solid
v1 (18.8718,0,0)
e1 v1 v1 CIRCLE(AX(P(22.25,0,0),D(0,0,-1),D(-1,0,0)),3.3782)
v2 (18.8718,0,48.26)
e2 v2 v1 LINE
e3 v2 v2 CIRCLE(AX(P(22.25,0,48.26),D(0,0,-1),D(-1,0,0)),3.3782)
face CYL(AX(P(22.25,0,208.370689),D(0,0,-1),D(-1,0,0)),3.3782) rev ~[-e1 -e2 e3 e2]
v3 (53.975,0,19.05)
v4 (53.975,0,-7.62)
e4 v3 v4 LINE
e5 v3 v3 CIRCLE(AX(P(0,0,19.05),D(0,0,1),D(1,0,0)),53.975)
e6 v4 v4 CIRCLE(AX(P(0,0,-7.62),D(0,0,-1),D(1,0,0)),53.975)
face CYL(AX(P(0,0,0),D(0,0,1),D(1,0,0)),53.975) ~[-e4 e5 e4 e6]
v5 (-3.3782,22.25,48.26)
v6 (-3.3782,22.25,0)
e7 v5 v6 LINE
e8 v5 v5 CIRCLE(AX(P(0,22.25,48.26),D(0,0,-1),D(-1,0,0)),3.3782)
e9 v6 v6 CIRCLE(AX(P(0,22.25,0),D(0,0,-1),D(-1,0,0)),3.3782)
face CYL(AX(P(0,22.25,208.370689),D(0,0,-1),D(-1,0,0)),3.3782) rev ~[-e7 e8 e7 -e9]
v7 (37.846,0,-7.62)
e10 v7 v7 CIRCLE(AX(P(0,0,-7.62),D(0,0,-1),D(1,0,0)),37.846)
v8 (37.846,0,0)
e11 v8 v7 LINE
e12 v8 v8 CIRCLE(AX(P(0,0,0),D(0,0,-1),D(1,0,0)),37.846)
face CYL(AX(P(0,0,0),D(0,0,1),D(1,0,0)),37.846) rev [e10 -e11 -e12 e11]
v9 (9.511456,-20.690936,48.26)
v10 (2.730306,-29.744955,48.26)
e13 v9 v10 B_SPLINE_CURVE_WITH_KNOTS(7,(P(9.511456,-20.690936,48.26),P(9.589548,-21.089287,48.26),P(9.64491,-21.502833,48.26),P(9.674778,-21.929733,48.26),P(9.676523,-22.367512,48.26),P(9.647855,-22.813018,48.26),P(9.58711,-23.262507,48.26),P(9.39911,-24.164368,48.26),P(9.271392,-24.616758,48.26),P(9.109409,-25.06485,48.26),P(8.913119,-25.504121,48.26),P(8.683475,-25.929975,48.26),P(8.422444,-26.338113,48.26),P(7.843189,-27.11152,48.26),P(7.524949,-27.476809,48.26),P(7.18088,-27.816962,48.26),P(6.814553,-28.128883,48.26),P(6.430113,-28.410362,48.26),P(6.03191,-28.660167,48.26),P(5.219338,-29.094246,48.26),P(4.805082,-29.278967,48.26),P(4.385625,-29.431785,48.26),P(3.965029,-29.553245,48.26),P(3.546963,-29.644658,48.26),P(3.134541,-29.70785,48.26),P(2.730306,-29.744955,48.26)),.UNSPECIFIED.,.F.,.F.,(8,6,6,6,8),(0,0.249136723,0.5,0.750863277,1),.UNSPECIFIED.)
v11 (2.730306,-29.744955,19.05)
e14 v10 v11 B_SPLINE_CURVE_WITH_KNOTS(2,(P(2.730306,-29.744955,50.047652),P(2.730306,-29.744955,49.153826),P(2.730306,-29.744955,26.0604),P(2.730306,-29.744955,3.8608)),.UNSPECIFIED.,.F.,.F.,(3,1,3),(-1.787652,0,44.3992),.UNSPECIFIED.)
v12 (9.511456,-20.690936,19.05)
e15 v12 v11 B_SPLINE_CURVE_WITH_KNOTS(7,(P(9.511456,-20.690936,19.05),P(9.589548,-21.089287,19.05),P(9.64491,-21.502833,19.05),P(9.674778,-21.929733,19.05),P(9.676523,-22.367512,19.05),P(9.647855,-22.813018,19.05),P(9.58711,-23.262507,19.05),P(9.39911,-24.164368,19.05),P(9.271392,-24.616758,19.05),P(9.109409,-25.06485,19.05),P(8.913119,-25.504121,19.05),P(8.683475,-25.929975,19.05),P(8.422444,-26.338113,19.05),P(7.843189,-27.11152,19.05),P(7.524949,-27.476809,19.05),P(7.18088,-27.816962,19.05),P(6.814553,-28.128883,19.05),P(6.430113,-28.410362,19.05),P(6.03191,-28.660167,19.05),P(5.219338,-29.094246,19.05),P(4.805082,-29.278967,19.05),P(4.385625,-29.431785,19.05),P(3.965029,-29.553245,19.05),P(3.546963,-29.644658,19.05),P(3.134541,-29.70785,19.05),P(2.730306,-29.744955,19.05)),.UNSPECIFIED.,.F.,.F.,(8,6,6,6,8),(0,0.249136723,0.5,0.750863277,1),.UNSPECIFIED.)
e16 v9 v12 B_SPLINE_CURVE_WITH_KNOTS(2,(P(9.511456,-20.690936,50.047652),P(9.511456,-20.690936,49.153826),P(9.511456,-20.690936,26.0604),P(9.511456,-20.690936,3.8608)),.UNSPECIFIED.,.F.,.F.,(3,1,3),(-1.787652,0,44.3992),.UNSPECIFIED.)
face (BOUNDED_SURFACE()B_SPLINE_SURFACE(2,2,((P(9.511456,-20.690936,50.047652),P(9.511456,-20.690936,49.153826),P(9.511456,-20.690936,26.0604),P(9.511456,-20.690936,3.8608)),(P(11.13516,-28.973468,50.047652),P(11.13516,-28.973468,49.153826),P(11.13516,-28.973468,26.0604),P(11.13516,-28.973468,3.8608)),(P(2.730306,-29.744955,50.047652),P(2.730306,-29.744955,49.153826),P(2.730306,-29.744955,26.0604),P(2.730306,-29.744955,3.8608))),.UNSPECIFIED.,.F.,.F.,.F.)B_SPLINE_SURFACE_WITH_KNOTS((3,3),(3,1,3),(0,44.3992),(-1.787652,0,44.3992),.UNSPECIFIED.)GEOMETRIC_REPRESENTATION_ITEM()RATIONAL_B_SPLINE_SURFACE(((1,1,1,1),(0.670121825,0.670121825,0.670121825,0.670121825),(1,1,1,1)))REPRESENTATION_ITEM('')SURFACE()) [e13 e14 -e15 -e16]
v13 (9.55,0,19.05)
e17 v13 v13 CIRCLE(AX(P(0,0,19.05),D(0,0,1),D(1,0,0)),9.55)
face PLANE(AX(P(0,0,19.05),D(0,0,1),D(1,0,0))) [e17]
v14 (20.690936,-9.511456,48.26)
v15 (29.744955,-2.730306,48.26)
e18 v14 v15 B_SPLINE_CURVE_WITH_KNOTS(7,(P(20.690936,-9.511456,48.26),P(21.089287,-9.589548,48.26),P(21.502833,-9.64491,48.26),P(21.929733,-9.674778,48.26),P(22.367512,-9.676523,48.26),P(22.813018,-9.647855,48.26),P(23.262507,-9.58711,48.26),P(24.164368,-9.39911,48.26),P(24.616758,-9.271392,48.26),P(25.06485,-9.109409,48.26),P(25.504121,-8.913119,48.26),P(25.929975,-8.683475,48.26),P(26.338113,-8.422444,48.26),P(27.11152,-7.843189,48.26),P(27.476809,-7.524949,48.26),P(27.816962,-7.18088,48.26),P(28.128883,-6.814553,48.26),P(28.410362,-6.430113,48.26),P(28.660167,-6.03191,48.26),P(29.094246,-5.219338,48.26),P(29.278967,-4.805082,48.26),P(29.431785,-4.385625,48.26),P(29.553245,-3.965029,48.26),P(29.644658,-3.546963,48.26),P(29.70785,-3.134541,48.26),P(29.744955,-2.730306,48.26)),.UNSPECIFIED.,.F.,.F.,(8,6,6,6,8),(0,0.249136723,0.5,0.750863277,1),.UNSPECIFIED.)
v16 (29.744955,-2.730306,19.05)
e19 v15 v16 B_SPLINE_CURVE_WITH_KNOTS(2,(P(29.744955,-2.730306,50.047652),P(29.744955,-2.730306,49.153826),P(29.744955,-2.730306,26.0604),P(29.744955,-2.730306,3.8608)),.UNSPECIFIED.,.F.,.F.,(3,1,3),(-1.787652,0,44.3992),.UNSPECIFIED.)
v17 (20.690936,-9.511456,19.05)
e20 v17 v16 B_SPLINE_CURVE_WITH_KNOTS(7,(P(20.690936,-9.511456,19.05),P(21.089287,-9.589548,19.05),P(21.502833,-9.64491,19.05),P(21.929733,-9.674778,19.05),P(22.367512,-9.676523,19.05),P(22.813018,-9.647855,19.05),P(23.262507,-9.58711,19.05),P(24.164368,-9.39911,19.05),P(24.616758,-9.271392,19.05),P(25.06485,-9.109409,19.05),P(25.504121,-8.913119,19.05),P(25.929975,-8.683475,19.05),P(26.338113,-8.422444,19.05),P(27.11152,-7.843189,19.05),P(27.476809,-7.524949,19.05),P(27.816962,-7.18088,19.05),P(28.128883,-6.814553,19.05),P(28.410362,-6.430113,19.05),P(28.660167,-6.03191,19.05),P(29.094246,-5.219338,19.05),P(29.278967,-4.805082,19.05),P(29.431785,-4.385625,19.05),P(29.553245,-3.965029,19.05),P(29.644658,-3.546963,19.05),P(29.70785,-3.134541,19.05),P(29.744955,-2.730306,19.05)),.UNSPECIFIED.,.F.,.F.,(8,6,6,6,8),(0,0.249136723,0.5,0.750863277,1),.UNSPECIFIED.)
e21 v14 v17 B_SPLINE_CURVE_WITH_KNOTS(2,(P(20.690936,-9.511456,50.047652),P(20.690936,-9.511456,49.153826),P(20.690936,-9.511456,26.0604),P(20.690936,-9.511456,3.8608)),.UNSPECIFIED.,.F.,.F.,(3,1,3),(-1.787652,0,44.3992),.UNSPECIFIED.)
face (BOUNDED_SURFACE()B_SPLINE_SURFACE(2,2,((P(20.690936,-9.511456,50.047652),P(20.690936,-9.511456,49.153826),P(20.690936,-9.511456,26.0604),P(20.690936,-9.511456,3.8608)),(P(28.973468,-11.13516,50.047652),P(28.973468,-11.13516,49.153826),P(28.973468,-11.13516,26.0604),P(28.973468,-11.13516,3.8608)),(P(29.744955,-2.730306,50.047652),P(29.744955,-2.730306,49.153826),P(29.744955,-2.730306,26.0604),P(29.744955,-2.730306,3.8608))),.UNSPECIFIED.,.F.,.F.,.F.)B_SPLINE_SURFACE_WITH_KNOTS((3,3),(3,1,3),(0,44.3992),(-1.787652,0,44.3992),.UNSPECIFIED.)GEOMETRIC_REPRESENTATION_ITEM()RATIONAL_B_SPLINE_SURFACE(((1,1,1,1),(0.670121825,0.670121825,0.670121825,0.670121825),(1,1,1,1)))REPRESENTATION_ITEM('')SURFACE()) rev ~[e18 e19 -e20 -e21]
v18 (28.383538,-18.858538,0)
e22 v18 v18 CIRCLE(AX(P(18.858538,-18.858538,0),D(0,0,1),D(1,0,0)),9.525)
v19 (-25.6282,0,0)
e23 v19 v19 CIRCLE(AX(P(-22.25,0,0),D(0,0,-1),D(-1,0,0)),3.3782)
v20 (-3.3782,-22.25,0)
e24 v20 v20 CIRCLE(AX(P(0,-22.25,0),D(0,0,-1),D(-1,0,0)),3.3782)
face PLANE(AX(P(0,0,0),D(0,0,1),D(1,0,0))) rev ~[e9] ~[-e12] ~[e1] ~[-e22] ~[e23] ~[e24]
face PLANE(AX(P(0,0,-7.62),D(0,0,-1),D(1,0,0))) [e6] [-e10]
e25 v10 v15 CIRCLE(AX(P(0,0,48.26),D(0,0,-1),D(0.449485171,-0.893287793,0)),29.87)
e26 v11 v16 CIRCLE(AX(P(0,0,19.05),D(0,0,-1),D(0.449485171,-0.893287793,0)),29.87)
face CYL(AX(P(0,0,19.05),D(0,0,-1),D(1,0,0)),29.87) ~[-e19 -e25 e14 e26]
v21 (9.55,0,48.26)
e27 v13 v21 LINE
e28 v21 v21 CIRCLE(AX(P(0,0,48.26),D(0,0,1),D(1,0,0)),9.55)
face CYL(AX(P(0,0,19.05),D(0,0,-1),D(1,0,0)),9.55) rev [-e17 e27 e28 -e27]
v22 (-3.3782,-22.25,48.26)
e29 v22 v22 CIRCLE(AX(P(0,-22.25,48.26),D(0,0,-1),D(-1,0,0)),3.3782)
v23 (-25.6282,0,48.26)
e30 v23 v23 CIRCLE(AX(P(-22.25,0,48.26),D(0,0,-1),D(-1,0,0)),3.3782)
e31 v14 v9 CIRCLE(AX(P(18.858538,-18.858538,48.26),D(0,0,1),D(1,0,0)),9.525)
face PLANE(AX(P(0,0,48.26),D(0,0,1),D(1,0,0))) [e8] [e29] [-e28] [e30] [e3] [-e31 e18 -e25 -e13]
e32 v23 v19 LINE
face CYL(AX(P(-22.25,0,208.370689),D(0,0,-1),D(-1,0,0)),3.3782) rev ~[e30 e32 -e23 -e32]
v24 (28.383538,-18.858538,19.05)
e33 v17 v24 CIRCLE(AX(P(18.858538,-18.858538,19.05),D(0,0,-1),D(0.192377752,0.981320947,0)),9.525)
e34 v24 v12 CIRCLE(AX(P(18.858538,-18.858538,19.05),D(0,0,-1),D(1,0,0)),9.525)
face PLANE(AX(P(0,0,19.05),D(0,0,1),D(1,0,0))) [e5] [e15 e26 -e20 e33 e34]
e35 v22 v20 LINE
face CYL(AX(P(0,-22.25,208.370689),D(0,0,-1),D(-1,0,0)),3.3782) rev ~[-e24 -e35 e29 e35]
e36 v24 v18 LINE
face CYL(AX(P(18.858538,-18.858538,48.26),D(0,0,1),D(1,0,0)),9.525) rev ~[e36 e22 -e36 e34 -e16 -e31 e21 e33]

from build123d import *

# Parameters (mm, degrees)
F0_R     = 53.975
F1_DEPTH = 19.05
F2_R     = 29.87
F2_R_2   = 9.55
F3_DEPTH = 29.21
F5_D     = 6.7564
F6_R     = 53.975
F6_R_2   = 37.846
F7_DEPTH = 7.62
F8_R     = 9.525
F9_DEPTH = 55.881
F10_R    = 7.62


with BuildPart() as f1:
    # F0 (on Top) → F1 (new body)
    with BuildSketch(Plane.XY):
        Circle(F0_R)
    extrude(amount=F1_DEPTH)

    # F2 (on face) → F3 (join)
    with BuildSketch(Plane.XY.offset(19.05)):
        Circle(F2_R)
        Circle(F2_R_2, mode=Mode.SUBTRACT)
    extrude(amount=F3_DEPTH)

    # F5 (through all)
    with Locations(Plane.XY.offset(48.26)):
        with Locations((-22.25, 0), (0, 22.25), (22.25, 0), (0, -22.25)):
            Hole(F5_D / 2)

    # F6 (on face) → F7 (join)
    with BuildSketch(Plane(origin=(0, 0, 0), x_dir=(1, 0, 0), z_dir=(0, 0, -1))):
        Circle(F6_R)
        Circle(F6_R_2, mode=Mode.SUBTRACT)
    extrude(amount=F7_DEPTH)

    # F8 (on face) → F9 (cut, through all)
    with BuildSketch(Plane.XY.offset(48.26)):
        with Locations((18.8585378542, -18.8585378542)):
            Circle(F8_R)
    extrude(amount=-F9_DEPTH, mode=Mode.SUBTRACT)

    # F10
    f10_edges = [f1.edges().sort_by_distance(p)[0] for p in [
        (26.682506, -13.426122, 33.655),
        (13.426122, -26.682506, 33.655),
    ]]
    fillet(f10_edges, radius=F10_R)


solid = f1.part
